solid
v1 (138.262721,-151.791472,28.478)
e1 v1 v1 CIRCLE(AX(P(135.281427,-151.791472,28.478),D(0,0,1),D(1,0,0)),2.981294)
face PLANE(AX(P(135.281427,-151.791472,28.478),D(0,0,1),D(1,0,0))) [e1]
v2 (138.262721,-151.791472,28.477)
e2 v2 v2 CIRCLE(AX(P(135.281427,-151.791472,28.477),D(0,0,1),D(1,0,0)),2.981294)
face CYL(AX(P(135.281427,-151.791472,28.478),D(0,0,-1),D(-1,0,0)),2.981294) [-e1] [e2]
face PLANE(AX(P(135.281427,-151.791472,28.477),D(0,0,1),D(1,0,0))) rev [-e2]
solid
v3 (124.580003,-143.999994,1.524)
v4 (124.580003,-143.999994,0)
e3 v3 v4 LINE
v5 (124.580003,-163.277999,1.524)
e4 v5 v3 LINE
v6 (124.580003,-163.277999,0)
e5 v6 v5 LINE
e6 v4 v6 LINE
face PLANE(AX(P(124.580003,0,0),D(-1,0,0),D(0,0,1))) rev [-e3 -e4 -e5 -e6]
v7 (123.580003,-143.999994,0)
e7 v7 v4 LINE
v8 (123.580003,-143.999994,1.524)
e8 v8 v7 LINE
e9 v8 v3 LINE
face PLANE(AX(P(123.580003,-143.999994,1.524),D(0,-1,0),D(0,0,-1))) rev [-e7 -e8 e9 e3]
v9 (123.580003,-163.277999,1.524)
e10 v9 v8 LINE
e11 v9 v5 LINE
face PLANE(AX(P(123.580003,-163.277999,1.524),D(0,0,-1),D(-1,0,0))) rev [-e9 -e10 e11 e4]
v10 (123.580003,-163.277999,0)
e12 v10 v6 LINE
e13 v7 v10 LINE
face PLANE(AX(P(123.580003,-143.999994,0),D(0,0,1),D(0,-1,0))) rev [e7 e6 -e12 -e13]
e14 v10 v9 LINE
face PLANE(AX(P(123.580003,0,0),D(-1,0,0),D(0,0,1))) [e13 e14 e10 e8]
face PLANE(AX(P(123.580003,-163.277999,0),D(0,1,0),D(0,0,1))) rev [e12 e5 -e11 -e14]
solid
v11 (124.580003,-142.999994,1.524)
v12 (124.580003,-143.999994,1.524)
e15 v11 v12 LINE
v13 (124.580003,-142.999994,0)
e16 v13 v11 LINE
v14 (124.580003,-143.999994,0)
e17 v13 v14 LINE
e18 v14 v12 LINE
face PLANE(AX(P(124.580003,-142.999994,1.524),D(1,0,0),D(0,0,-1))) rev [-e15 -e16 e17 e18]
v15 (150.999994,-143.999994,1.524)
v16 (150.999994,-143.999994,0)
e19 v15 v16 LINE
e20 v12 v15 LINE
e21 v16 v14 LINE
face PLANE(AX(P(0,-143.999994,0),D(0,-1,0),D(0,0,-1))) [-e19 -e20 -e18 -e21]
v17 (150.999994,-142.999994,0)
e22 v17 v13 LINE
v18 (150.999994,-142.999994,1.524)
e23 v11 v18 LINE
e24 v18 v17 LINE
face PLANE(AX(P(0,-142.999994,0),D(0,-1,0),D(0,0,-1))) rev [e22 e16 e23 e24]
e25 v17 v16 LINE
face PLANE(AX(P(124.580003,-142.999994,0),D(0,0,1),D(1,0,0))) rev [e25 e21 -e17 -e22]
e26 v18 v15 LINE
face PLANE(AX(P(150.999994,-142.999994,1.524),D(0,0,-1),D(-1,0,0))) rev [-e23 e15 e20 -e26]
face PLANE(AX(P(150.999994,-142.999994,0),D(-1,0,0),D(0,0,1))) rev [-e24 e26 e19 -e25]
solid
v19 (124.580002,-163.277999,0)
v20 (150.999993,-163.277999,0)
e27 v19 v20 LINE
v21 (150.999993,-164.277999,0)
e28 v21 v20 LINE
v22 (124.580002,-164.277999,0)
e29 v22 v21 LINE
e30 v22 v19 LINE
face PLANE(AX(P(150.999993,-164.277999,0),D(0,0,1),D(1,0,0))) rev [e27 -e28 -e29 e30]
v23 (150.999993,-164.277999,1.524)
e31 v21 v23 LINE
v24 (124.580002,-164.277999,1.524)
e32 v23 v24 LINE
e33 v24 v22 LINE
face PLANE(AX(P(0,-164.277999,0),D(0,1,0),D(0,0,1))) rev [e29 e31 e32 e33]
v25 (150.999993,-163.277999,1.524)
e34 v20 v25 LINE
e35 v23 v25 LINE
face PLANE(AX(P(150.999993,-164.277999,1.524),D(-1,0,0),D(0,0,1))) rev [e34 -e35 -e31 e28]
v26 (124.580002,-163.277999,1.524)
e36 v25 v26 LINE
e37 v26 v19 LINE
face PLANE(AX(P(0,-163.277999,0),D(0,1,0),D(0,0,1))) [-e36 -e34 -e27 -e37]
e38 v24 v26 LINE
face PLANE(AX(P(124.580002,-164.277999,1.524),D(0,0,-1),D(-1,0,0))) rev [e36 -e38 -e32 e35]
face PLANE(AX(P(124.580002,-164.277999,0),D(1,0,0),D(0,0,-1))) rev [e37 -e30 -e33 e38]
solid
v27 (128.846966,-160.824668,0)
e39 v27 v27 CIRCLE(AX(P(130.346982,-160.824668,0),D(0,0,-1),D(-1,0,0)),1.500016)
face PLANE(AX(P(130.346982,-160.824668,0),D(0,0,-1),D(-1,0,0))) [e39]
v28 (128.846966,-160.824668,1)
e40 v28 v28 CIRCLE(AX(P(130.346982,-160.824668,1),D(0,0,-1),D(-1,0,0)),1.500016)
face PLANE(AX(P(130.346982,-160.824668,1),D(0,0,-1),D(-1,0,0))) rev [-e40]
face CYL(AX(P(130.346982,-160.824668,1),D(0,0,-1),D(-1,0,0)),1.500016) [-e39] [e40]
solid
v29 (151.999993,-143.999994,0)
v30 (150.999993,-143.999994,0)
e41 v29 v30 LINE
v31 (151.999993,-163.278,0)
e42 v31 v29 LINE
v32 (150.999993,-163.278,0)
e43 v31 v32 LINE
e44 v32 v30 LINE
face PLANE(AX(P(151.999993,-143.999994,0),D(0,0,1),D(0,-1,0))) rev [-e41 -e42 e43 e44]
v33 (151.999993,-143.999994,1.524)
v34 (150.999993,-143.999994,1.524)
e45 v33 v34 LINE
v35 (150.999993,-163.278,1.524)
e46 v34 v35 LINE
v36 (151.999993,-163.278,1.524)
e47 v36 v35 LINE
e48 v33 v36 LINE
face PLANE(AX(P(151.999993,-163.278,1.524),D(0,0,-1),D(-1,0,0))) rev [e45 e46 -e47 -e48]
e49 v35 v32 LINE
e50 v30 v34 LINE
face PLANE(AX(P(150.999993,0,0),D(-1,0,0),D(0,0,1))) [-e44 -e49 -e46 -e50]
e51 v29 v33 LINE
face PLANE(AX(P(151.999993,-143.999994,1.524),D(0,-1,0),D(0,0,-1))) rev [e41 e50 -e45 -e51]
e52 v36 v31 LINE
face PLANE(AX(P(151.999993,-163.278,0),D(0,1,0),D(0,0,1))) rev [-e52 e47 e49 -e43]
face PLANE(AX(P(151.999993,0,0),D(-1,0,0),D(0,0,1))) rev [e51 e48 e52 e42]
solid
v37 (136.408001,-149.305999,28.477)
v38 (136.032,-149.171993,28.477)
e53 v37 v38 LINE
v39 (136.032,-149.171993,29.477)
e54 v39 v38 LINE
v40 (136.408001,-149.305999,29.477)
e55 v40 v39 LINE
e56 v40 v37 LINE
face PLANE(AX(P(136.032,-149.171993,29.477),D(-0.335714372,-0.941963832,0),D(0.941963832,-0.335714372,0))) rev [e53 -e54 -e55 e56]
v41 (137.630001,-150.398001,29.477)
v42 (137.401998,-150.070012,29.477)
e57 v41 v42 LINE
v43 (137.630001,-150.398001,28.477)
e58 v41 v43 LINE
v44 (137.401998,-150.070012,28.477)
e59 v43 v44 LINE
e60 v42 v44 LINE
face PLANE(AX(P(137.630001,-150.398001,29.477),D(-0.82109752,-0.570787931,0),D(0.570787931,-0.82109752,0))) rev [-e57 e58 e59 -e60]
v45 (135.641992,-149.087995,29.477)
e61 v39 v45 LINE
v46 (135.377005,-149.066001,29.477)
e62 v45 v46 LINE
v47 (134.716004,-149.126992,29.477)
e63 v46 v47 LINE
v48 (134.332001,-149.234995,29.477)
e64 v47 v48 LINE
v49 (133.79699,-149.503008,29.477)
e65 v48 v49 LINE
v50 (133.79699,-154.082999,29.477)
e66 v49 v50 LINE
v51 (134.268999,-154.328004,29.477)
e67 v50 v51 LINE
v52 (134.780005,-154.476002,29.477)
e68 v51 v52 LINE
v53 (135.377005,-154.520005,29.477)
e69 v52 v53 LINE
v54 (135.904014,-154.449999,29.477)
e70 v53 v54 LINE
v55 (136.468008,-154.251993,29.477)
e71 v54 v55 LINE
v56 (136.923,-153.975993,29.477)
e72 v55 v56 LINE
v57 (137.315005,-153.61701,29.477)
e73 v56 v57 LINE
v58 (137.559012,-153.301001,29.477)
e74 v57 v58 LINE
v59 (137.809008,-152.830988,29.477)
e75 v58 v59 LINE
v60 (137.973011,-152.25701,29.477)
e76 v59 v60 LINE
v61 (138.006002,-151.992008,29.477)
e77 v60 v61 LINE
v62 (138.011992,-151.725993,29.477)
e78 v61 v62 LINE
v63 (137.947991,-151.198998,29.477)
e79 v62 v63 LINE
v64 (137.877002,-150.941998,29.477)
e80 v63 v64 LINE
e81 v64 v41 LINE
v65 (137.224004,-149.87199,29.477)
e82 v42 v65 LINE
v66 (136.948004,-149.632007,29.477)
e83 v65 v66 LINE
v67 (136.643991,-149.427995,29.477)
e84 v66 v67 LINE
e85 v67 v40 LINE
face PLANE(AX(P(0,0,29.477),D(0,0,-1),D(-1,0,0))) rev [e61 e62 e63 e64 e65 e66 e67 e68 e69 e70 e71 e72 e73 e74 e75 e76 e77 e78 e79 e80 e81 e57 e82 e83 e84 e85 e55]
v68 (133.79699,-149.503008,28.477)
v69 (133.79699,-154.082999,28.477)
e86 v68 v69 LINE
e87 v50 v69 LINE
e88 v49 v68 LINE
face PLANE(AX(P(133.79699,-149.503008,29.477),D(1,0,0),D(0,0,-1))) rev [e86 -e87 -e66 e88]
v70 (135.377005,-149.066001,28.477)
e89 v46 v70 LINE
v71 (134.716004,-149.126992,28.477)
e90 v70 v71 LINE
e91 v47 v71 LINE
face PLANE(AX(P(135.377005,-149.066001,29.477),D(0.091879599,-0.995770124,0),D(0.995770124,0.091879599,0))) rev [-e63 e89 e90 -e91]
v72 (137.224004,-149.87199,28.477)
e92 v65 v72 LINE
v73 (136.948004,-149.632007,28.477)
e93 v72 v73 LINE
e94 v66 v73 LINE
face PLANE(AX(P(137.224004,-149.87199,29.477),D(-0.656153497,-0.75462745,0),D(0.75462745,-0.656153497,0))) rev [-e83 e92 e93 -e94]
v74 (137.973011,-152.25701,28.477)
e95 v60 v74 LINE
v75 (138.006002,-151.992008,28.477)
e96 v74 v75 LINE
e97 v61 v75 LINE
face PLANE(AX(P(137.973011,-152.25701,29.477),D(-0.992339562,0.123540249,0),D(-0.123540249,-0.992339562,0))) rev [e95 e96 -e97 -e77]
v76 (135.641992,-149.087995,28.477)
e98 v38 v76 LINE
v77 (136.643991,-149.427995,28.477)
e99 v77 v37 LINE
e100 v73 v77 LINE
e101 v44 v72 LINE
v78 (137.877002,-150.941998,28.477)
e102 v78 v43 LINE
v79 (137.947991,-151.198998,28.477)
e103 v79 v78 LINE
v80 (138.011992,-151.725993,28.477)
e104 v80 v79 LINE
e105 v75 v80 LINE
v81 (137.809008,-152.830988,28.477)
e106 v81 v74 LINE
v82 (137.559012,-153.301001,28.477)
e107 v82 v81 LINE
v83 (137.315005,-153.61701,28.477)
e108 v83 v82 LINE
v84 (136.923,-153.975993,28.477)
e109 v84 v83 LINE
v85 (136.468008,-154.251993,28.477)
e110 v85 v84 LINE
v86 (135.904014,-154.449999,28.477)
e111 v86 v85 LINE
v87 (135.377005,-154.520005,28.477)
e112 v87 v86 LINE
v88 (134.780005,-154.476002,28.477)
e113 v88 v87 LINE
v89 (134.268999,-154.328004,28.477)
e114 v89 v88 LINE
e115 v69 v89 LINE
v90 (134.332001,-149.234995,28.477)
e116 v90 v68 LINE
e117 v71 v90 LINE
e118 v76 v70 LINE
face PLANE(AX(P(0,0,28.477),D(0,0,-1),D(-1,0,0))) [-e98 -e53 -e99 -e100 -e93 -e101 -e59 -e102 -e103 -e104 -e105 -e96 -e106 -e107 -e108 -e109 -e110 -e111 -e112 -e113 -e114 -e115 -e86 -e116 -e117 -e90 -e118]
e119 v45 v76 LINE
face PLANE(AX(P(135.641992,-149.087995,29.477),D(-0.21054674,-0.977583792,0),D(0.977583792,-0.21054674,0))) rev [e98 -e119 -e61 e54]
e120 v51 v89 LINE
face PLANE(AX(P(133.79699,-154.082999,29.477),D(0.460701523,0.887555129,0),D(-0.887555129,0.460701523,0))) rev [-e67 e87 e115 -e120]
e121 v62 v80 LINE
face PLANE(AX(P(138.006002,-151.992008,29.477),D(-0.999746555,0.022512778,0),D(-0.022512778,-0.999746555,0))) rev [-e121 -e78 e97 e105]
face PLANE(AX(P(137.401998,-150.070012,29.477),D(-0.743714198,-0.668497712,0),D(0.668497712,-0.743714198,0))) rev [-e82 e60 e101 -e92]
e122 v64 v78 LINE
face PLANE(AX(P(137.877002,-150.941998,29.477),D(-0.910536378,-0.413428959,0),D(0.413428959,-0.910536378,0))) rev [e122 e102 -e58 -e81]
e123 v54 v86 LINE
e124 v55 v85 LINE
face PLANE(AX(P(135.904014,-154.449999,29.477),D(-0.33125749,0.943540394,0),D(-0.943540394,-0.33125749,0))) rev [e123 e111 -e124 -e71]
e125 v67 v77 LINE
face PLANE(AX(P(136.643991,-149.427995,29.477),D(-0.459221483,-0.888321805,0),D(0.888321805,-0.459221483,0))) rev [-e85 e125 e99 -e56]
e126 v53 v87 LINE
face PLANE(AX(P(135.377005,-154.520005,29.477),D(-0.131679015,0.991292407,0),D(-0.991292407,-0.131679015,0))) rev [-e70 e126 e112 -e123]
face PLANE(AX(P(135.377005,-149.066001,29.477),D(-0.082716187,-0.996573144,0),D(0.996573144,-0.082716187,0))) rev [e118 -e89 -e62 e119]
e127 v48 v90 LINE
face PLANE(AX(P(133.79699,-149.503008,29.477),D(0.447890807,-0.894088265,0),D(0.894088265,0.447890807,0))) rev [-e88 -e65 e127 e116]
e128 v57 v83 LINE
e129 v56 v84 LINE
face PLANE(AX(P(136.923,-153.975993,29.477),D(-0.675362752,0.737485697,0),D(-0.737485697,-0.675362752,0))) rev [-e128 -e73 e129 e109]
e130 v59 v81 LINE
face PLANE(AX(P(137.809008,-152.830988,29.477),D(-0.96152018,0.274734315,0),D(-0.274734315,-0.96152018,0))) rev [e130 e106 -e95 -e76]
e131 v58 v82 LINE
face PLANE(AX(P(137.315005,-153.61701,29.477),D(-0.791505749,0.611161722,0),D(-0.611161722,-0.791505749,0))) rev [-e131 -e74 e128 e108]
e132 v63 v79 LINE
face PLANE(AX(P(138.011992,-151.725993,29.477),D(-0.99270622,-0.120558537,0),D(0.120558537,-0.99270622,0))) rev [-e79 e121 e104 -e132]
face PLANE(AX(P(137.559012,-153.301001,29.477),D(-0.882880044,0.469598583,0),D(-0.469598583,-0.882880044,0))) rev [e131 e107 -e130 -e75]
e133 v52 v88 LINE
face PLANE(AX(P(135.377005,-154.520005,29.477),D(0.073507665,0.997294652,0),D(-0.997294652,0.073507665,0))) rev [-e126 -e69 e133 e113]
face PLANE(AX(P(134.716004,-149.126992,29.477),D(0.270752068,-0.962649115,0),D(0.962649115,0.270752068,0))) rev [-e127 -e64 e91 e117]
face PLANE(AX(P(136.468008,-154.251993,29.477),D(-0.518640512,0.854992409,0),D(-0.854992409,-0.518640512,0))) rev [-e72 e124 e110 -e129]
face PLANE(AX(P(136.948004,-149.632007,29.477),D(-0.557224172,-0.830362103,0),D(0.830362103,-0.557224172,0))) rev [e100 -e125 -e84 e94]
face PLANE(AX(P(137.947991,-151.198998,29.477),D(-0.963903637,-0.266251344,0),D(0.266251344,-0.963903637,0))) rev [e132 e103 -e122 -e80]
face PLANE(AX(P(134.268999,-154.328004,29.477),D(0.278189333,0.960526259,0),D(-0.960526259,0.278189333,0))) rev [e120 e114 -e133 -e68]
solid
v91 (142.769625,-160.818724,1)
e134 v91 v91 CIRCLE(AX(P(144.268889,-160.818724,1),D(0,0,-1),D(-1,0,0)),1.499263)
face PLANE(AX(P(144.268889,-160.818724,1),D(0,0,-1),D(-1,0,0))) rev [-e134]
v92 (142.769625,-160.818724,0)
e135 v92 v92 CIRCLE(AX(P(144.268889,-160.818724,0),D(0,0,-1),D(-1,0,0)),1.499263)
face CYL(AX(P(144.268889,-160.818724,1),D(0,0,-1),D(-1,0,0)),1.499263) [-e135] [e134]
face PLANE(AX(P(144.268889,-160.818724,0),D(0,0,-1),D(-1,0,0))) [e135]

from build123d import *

# Parameters (mm, degrees)
SKETCH2_R               = 2.981293854
ENCODERAXISATTACH_DEPTH = 0.001
SKETCH3_W               = 1.524000079
SKETCH3_H               = 19.278004866
BOSS_EXTRUDE3_DEPTH     = 1
SKETCH4_W               = 26.419990765
SKETCH4_H               = 1.524000079
BOSS_EXTRUDE4_DEPTH     = 1
SKETCH6_W               = 1.524000079
SKETCH6_H               = 19.278005766
BOSS_EXTRUDE5_DEPTH     = 1
SKETCH7_W               = 26.419990765
SKETCH7_H               = 1.524000079
BOSS_EXTRUDE6_DEPTH     = 1
BOSS_EXTRUDE1_DEPTH     = 1
SKETCH8_R               = 1.499263455
BOSS_EXTRUDE7_DEPTH     = 1
SKETCH8_R_2             = 1.500016471
BOSS_EXTRUDE7_2_DEPTH   = 1


# Read off the part's stored shape, not the designer's step: Surface-Imported1
with BuildPart() as part:
    # Sketch2 → encoderaxisattach (new body)
    with BuildSketch(Plane.XY.offset(28.477000073)):
        with Locations((135.281426774, -151.791471956)):
            Circle(SKETCH2_R)
    extrude(amount=ENCODERAXISATTACH_DEPTH)


with BuildPart() as body_2:
    # Sketch3 → Boss-Extrude3 (new body)
    with BuildSketch(Plane.ZY.offset(-124.580003321)):
        with Locations((0.76200004, -153.638996134)):
            Rectangle(SKETCH3_W, SKETCH3_H)
    extrude(amount=BOSS_EXTRUDE3_DEPTH)


with BuildPart() as body_3:
    # Sketch4 → Boss-Extrude4 (new body)
    with BuildSketch(Plane(origin=(0, -143.999993801, 0), x_dir=(1, 0, 0), z_dir=(0, 1, 0))):
        with Locations((137.789998704, -0.76200004)):
            Rectangle(SKETCH4_W, SKETCH4_H)
    extrude(amount=BOSS_EXTRUDE4_DEPTH)


with BuildPart() as body_4:
    # Sketch6 → Boss-Extrude5 (new body)
    with BuildSketch(Plane(origin=(150.999993086, 0, 0), x_dir=(0, 0, -1), z_dir=(1, 0, 0))):
        with Locations((-0.76200004, -153.638996684)):
            Rectangle(SKETCH6_W, SKETCH6_H)
    extrude(amount=BOSS_EXTRUDE5_DEPTH)


with BuildPart() as body_5:
    # Sketch7 → Boss-Extrude6 (new body)
    with BuildSketch(Plane.XZ.offset(163.277998567)):
        with Locations((137.789997704, 0.76200004)):
            Rectangle(SKETCH7_W, SKETCH7_H)
    extrude(amount=BOSS_EXTRUDE6_DEPTH)


with BuildPart() as body_6:
    # Sketch1 → Boss-Extrude1 (new body)
    with BuildSketch(Plane.XY.offset(28.477000073)):
        Polygon((133.796989918, -154.082998633), (134.2689991, -154.328003526), (134.780004621, -154.476001859), (135.377004743, -154.520004988), (135.904014111, -154.449999332), (136.468008161, -154.251992702), (136.923000216, -153.975993395), (137.315005064, -153.617009521), (137.559011579, -153.301000595), (137.80900836, -152.830988169), (137.97301054, -152.257010341), (138.006001711, -151.99200809), (138.011991978, -151.72599256), (137.94799149, -151.198998094), (137.877002358, -150.941997766), (137.63000071, -150.398001075), (137.401998043, -150.070011616), (137.224003673, -149.871990085), (136.948004365, -149.632006884), (136.643990874, -149.427995086), (136.408001184, -149.305999279), (136.032000184, -149.171993136), (135.641992092, -149.087995291), (135.377004743, -149.066001177), (134.716004133, -149.12699163), (134.332001209, -149.234995246), (133.796989918, -149.503007531), align=None)
    extrude(amount=BOSS_EXTRUDE1_DEPTH)


with BuildPart() as body_7:
    # Sketch8 → Boss-Extrude7 (new body)
    with BuildSketch(Plane(origin=(0, 0, 0), x_dir=(-1, 0, 0), z_dir=(0, 0, -1))):
        with Locations((-144.26888852, -160.818724299)):
            Circle(SKETCH8_R)
    extrude(amount=-BOSS_EXTRUDE7_DEPTH)


with BuildPart() as body_8:
    # Sketch8 → Boss-Extrude7 2 (new body)
    with BuildSketch(Plane(origin=(0, 0, 0), x_dir=(-1, 0, 0), z_dir=(0, 0, -1))):
        with Locations((-130.346982161, -160.824667911)):
            Circle(SKETCH8_R_2)
    extrude(amount=-BOSS_EXTRUDE7_2_DEPTH)


solid = Compound([part.part, body_2.part, body_3.part, body_4.part, body_5.part, body_6.part, body_7.part, body_8.part])
